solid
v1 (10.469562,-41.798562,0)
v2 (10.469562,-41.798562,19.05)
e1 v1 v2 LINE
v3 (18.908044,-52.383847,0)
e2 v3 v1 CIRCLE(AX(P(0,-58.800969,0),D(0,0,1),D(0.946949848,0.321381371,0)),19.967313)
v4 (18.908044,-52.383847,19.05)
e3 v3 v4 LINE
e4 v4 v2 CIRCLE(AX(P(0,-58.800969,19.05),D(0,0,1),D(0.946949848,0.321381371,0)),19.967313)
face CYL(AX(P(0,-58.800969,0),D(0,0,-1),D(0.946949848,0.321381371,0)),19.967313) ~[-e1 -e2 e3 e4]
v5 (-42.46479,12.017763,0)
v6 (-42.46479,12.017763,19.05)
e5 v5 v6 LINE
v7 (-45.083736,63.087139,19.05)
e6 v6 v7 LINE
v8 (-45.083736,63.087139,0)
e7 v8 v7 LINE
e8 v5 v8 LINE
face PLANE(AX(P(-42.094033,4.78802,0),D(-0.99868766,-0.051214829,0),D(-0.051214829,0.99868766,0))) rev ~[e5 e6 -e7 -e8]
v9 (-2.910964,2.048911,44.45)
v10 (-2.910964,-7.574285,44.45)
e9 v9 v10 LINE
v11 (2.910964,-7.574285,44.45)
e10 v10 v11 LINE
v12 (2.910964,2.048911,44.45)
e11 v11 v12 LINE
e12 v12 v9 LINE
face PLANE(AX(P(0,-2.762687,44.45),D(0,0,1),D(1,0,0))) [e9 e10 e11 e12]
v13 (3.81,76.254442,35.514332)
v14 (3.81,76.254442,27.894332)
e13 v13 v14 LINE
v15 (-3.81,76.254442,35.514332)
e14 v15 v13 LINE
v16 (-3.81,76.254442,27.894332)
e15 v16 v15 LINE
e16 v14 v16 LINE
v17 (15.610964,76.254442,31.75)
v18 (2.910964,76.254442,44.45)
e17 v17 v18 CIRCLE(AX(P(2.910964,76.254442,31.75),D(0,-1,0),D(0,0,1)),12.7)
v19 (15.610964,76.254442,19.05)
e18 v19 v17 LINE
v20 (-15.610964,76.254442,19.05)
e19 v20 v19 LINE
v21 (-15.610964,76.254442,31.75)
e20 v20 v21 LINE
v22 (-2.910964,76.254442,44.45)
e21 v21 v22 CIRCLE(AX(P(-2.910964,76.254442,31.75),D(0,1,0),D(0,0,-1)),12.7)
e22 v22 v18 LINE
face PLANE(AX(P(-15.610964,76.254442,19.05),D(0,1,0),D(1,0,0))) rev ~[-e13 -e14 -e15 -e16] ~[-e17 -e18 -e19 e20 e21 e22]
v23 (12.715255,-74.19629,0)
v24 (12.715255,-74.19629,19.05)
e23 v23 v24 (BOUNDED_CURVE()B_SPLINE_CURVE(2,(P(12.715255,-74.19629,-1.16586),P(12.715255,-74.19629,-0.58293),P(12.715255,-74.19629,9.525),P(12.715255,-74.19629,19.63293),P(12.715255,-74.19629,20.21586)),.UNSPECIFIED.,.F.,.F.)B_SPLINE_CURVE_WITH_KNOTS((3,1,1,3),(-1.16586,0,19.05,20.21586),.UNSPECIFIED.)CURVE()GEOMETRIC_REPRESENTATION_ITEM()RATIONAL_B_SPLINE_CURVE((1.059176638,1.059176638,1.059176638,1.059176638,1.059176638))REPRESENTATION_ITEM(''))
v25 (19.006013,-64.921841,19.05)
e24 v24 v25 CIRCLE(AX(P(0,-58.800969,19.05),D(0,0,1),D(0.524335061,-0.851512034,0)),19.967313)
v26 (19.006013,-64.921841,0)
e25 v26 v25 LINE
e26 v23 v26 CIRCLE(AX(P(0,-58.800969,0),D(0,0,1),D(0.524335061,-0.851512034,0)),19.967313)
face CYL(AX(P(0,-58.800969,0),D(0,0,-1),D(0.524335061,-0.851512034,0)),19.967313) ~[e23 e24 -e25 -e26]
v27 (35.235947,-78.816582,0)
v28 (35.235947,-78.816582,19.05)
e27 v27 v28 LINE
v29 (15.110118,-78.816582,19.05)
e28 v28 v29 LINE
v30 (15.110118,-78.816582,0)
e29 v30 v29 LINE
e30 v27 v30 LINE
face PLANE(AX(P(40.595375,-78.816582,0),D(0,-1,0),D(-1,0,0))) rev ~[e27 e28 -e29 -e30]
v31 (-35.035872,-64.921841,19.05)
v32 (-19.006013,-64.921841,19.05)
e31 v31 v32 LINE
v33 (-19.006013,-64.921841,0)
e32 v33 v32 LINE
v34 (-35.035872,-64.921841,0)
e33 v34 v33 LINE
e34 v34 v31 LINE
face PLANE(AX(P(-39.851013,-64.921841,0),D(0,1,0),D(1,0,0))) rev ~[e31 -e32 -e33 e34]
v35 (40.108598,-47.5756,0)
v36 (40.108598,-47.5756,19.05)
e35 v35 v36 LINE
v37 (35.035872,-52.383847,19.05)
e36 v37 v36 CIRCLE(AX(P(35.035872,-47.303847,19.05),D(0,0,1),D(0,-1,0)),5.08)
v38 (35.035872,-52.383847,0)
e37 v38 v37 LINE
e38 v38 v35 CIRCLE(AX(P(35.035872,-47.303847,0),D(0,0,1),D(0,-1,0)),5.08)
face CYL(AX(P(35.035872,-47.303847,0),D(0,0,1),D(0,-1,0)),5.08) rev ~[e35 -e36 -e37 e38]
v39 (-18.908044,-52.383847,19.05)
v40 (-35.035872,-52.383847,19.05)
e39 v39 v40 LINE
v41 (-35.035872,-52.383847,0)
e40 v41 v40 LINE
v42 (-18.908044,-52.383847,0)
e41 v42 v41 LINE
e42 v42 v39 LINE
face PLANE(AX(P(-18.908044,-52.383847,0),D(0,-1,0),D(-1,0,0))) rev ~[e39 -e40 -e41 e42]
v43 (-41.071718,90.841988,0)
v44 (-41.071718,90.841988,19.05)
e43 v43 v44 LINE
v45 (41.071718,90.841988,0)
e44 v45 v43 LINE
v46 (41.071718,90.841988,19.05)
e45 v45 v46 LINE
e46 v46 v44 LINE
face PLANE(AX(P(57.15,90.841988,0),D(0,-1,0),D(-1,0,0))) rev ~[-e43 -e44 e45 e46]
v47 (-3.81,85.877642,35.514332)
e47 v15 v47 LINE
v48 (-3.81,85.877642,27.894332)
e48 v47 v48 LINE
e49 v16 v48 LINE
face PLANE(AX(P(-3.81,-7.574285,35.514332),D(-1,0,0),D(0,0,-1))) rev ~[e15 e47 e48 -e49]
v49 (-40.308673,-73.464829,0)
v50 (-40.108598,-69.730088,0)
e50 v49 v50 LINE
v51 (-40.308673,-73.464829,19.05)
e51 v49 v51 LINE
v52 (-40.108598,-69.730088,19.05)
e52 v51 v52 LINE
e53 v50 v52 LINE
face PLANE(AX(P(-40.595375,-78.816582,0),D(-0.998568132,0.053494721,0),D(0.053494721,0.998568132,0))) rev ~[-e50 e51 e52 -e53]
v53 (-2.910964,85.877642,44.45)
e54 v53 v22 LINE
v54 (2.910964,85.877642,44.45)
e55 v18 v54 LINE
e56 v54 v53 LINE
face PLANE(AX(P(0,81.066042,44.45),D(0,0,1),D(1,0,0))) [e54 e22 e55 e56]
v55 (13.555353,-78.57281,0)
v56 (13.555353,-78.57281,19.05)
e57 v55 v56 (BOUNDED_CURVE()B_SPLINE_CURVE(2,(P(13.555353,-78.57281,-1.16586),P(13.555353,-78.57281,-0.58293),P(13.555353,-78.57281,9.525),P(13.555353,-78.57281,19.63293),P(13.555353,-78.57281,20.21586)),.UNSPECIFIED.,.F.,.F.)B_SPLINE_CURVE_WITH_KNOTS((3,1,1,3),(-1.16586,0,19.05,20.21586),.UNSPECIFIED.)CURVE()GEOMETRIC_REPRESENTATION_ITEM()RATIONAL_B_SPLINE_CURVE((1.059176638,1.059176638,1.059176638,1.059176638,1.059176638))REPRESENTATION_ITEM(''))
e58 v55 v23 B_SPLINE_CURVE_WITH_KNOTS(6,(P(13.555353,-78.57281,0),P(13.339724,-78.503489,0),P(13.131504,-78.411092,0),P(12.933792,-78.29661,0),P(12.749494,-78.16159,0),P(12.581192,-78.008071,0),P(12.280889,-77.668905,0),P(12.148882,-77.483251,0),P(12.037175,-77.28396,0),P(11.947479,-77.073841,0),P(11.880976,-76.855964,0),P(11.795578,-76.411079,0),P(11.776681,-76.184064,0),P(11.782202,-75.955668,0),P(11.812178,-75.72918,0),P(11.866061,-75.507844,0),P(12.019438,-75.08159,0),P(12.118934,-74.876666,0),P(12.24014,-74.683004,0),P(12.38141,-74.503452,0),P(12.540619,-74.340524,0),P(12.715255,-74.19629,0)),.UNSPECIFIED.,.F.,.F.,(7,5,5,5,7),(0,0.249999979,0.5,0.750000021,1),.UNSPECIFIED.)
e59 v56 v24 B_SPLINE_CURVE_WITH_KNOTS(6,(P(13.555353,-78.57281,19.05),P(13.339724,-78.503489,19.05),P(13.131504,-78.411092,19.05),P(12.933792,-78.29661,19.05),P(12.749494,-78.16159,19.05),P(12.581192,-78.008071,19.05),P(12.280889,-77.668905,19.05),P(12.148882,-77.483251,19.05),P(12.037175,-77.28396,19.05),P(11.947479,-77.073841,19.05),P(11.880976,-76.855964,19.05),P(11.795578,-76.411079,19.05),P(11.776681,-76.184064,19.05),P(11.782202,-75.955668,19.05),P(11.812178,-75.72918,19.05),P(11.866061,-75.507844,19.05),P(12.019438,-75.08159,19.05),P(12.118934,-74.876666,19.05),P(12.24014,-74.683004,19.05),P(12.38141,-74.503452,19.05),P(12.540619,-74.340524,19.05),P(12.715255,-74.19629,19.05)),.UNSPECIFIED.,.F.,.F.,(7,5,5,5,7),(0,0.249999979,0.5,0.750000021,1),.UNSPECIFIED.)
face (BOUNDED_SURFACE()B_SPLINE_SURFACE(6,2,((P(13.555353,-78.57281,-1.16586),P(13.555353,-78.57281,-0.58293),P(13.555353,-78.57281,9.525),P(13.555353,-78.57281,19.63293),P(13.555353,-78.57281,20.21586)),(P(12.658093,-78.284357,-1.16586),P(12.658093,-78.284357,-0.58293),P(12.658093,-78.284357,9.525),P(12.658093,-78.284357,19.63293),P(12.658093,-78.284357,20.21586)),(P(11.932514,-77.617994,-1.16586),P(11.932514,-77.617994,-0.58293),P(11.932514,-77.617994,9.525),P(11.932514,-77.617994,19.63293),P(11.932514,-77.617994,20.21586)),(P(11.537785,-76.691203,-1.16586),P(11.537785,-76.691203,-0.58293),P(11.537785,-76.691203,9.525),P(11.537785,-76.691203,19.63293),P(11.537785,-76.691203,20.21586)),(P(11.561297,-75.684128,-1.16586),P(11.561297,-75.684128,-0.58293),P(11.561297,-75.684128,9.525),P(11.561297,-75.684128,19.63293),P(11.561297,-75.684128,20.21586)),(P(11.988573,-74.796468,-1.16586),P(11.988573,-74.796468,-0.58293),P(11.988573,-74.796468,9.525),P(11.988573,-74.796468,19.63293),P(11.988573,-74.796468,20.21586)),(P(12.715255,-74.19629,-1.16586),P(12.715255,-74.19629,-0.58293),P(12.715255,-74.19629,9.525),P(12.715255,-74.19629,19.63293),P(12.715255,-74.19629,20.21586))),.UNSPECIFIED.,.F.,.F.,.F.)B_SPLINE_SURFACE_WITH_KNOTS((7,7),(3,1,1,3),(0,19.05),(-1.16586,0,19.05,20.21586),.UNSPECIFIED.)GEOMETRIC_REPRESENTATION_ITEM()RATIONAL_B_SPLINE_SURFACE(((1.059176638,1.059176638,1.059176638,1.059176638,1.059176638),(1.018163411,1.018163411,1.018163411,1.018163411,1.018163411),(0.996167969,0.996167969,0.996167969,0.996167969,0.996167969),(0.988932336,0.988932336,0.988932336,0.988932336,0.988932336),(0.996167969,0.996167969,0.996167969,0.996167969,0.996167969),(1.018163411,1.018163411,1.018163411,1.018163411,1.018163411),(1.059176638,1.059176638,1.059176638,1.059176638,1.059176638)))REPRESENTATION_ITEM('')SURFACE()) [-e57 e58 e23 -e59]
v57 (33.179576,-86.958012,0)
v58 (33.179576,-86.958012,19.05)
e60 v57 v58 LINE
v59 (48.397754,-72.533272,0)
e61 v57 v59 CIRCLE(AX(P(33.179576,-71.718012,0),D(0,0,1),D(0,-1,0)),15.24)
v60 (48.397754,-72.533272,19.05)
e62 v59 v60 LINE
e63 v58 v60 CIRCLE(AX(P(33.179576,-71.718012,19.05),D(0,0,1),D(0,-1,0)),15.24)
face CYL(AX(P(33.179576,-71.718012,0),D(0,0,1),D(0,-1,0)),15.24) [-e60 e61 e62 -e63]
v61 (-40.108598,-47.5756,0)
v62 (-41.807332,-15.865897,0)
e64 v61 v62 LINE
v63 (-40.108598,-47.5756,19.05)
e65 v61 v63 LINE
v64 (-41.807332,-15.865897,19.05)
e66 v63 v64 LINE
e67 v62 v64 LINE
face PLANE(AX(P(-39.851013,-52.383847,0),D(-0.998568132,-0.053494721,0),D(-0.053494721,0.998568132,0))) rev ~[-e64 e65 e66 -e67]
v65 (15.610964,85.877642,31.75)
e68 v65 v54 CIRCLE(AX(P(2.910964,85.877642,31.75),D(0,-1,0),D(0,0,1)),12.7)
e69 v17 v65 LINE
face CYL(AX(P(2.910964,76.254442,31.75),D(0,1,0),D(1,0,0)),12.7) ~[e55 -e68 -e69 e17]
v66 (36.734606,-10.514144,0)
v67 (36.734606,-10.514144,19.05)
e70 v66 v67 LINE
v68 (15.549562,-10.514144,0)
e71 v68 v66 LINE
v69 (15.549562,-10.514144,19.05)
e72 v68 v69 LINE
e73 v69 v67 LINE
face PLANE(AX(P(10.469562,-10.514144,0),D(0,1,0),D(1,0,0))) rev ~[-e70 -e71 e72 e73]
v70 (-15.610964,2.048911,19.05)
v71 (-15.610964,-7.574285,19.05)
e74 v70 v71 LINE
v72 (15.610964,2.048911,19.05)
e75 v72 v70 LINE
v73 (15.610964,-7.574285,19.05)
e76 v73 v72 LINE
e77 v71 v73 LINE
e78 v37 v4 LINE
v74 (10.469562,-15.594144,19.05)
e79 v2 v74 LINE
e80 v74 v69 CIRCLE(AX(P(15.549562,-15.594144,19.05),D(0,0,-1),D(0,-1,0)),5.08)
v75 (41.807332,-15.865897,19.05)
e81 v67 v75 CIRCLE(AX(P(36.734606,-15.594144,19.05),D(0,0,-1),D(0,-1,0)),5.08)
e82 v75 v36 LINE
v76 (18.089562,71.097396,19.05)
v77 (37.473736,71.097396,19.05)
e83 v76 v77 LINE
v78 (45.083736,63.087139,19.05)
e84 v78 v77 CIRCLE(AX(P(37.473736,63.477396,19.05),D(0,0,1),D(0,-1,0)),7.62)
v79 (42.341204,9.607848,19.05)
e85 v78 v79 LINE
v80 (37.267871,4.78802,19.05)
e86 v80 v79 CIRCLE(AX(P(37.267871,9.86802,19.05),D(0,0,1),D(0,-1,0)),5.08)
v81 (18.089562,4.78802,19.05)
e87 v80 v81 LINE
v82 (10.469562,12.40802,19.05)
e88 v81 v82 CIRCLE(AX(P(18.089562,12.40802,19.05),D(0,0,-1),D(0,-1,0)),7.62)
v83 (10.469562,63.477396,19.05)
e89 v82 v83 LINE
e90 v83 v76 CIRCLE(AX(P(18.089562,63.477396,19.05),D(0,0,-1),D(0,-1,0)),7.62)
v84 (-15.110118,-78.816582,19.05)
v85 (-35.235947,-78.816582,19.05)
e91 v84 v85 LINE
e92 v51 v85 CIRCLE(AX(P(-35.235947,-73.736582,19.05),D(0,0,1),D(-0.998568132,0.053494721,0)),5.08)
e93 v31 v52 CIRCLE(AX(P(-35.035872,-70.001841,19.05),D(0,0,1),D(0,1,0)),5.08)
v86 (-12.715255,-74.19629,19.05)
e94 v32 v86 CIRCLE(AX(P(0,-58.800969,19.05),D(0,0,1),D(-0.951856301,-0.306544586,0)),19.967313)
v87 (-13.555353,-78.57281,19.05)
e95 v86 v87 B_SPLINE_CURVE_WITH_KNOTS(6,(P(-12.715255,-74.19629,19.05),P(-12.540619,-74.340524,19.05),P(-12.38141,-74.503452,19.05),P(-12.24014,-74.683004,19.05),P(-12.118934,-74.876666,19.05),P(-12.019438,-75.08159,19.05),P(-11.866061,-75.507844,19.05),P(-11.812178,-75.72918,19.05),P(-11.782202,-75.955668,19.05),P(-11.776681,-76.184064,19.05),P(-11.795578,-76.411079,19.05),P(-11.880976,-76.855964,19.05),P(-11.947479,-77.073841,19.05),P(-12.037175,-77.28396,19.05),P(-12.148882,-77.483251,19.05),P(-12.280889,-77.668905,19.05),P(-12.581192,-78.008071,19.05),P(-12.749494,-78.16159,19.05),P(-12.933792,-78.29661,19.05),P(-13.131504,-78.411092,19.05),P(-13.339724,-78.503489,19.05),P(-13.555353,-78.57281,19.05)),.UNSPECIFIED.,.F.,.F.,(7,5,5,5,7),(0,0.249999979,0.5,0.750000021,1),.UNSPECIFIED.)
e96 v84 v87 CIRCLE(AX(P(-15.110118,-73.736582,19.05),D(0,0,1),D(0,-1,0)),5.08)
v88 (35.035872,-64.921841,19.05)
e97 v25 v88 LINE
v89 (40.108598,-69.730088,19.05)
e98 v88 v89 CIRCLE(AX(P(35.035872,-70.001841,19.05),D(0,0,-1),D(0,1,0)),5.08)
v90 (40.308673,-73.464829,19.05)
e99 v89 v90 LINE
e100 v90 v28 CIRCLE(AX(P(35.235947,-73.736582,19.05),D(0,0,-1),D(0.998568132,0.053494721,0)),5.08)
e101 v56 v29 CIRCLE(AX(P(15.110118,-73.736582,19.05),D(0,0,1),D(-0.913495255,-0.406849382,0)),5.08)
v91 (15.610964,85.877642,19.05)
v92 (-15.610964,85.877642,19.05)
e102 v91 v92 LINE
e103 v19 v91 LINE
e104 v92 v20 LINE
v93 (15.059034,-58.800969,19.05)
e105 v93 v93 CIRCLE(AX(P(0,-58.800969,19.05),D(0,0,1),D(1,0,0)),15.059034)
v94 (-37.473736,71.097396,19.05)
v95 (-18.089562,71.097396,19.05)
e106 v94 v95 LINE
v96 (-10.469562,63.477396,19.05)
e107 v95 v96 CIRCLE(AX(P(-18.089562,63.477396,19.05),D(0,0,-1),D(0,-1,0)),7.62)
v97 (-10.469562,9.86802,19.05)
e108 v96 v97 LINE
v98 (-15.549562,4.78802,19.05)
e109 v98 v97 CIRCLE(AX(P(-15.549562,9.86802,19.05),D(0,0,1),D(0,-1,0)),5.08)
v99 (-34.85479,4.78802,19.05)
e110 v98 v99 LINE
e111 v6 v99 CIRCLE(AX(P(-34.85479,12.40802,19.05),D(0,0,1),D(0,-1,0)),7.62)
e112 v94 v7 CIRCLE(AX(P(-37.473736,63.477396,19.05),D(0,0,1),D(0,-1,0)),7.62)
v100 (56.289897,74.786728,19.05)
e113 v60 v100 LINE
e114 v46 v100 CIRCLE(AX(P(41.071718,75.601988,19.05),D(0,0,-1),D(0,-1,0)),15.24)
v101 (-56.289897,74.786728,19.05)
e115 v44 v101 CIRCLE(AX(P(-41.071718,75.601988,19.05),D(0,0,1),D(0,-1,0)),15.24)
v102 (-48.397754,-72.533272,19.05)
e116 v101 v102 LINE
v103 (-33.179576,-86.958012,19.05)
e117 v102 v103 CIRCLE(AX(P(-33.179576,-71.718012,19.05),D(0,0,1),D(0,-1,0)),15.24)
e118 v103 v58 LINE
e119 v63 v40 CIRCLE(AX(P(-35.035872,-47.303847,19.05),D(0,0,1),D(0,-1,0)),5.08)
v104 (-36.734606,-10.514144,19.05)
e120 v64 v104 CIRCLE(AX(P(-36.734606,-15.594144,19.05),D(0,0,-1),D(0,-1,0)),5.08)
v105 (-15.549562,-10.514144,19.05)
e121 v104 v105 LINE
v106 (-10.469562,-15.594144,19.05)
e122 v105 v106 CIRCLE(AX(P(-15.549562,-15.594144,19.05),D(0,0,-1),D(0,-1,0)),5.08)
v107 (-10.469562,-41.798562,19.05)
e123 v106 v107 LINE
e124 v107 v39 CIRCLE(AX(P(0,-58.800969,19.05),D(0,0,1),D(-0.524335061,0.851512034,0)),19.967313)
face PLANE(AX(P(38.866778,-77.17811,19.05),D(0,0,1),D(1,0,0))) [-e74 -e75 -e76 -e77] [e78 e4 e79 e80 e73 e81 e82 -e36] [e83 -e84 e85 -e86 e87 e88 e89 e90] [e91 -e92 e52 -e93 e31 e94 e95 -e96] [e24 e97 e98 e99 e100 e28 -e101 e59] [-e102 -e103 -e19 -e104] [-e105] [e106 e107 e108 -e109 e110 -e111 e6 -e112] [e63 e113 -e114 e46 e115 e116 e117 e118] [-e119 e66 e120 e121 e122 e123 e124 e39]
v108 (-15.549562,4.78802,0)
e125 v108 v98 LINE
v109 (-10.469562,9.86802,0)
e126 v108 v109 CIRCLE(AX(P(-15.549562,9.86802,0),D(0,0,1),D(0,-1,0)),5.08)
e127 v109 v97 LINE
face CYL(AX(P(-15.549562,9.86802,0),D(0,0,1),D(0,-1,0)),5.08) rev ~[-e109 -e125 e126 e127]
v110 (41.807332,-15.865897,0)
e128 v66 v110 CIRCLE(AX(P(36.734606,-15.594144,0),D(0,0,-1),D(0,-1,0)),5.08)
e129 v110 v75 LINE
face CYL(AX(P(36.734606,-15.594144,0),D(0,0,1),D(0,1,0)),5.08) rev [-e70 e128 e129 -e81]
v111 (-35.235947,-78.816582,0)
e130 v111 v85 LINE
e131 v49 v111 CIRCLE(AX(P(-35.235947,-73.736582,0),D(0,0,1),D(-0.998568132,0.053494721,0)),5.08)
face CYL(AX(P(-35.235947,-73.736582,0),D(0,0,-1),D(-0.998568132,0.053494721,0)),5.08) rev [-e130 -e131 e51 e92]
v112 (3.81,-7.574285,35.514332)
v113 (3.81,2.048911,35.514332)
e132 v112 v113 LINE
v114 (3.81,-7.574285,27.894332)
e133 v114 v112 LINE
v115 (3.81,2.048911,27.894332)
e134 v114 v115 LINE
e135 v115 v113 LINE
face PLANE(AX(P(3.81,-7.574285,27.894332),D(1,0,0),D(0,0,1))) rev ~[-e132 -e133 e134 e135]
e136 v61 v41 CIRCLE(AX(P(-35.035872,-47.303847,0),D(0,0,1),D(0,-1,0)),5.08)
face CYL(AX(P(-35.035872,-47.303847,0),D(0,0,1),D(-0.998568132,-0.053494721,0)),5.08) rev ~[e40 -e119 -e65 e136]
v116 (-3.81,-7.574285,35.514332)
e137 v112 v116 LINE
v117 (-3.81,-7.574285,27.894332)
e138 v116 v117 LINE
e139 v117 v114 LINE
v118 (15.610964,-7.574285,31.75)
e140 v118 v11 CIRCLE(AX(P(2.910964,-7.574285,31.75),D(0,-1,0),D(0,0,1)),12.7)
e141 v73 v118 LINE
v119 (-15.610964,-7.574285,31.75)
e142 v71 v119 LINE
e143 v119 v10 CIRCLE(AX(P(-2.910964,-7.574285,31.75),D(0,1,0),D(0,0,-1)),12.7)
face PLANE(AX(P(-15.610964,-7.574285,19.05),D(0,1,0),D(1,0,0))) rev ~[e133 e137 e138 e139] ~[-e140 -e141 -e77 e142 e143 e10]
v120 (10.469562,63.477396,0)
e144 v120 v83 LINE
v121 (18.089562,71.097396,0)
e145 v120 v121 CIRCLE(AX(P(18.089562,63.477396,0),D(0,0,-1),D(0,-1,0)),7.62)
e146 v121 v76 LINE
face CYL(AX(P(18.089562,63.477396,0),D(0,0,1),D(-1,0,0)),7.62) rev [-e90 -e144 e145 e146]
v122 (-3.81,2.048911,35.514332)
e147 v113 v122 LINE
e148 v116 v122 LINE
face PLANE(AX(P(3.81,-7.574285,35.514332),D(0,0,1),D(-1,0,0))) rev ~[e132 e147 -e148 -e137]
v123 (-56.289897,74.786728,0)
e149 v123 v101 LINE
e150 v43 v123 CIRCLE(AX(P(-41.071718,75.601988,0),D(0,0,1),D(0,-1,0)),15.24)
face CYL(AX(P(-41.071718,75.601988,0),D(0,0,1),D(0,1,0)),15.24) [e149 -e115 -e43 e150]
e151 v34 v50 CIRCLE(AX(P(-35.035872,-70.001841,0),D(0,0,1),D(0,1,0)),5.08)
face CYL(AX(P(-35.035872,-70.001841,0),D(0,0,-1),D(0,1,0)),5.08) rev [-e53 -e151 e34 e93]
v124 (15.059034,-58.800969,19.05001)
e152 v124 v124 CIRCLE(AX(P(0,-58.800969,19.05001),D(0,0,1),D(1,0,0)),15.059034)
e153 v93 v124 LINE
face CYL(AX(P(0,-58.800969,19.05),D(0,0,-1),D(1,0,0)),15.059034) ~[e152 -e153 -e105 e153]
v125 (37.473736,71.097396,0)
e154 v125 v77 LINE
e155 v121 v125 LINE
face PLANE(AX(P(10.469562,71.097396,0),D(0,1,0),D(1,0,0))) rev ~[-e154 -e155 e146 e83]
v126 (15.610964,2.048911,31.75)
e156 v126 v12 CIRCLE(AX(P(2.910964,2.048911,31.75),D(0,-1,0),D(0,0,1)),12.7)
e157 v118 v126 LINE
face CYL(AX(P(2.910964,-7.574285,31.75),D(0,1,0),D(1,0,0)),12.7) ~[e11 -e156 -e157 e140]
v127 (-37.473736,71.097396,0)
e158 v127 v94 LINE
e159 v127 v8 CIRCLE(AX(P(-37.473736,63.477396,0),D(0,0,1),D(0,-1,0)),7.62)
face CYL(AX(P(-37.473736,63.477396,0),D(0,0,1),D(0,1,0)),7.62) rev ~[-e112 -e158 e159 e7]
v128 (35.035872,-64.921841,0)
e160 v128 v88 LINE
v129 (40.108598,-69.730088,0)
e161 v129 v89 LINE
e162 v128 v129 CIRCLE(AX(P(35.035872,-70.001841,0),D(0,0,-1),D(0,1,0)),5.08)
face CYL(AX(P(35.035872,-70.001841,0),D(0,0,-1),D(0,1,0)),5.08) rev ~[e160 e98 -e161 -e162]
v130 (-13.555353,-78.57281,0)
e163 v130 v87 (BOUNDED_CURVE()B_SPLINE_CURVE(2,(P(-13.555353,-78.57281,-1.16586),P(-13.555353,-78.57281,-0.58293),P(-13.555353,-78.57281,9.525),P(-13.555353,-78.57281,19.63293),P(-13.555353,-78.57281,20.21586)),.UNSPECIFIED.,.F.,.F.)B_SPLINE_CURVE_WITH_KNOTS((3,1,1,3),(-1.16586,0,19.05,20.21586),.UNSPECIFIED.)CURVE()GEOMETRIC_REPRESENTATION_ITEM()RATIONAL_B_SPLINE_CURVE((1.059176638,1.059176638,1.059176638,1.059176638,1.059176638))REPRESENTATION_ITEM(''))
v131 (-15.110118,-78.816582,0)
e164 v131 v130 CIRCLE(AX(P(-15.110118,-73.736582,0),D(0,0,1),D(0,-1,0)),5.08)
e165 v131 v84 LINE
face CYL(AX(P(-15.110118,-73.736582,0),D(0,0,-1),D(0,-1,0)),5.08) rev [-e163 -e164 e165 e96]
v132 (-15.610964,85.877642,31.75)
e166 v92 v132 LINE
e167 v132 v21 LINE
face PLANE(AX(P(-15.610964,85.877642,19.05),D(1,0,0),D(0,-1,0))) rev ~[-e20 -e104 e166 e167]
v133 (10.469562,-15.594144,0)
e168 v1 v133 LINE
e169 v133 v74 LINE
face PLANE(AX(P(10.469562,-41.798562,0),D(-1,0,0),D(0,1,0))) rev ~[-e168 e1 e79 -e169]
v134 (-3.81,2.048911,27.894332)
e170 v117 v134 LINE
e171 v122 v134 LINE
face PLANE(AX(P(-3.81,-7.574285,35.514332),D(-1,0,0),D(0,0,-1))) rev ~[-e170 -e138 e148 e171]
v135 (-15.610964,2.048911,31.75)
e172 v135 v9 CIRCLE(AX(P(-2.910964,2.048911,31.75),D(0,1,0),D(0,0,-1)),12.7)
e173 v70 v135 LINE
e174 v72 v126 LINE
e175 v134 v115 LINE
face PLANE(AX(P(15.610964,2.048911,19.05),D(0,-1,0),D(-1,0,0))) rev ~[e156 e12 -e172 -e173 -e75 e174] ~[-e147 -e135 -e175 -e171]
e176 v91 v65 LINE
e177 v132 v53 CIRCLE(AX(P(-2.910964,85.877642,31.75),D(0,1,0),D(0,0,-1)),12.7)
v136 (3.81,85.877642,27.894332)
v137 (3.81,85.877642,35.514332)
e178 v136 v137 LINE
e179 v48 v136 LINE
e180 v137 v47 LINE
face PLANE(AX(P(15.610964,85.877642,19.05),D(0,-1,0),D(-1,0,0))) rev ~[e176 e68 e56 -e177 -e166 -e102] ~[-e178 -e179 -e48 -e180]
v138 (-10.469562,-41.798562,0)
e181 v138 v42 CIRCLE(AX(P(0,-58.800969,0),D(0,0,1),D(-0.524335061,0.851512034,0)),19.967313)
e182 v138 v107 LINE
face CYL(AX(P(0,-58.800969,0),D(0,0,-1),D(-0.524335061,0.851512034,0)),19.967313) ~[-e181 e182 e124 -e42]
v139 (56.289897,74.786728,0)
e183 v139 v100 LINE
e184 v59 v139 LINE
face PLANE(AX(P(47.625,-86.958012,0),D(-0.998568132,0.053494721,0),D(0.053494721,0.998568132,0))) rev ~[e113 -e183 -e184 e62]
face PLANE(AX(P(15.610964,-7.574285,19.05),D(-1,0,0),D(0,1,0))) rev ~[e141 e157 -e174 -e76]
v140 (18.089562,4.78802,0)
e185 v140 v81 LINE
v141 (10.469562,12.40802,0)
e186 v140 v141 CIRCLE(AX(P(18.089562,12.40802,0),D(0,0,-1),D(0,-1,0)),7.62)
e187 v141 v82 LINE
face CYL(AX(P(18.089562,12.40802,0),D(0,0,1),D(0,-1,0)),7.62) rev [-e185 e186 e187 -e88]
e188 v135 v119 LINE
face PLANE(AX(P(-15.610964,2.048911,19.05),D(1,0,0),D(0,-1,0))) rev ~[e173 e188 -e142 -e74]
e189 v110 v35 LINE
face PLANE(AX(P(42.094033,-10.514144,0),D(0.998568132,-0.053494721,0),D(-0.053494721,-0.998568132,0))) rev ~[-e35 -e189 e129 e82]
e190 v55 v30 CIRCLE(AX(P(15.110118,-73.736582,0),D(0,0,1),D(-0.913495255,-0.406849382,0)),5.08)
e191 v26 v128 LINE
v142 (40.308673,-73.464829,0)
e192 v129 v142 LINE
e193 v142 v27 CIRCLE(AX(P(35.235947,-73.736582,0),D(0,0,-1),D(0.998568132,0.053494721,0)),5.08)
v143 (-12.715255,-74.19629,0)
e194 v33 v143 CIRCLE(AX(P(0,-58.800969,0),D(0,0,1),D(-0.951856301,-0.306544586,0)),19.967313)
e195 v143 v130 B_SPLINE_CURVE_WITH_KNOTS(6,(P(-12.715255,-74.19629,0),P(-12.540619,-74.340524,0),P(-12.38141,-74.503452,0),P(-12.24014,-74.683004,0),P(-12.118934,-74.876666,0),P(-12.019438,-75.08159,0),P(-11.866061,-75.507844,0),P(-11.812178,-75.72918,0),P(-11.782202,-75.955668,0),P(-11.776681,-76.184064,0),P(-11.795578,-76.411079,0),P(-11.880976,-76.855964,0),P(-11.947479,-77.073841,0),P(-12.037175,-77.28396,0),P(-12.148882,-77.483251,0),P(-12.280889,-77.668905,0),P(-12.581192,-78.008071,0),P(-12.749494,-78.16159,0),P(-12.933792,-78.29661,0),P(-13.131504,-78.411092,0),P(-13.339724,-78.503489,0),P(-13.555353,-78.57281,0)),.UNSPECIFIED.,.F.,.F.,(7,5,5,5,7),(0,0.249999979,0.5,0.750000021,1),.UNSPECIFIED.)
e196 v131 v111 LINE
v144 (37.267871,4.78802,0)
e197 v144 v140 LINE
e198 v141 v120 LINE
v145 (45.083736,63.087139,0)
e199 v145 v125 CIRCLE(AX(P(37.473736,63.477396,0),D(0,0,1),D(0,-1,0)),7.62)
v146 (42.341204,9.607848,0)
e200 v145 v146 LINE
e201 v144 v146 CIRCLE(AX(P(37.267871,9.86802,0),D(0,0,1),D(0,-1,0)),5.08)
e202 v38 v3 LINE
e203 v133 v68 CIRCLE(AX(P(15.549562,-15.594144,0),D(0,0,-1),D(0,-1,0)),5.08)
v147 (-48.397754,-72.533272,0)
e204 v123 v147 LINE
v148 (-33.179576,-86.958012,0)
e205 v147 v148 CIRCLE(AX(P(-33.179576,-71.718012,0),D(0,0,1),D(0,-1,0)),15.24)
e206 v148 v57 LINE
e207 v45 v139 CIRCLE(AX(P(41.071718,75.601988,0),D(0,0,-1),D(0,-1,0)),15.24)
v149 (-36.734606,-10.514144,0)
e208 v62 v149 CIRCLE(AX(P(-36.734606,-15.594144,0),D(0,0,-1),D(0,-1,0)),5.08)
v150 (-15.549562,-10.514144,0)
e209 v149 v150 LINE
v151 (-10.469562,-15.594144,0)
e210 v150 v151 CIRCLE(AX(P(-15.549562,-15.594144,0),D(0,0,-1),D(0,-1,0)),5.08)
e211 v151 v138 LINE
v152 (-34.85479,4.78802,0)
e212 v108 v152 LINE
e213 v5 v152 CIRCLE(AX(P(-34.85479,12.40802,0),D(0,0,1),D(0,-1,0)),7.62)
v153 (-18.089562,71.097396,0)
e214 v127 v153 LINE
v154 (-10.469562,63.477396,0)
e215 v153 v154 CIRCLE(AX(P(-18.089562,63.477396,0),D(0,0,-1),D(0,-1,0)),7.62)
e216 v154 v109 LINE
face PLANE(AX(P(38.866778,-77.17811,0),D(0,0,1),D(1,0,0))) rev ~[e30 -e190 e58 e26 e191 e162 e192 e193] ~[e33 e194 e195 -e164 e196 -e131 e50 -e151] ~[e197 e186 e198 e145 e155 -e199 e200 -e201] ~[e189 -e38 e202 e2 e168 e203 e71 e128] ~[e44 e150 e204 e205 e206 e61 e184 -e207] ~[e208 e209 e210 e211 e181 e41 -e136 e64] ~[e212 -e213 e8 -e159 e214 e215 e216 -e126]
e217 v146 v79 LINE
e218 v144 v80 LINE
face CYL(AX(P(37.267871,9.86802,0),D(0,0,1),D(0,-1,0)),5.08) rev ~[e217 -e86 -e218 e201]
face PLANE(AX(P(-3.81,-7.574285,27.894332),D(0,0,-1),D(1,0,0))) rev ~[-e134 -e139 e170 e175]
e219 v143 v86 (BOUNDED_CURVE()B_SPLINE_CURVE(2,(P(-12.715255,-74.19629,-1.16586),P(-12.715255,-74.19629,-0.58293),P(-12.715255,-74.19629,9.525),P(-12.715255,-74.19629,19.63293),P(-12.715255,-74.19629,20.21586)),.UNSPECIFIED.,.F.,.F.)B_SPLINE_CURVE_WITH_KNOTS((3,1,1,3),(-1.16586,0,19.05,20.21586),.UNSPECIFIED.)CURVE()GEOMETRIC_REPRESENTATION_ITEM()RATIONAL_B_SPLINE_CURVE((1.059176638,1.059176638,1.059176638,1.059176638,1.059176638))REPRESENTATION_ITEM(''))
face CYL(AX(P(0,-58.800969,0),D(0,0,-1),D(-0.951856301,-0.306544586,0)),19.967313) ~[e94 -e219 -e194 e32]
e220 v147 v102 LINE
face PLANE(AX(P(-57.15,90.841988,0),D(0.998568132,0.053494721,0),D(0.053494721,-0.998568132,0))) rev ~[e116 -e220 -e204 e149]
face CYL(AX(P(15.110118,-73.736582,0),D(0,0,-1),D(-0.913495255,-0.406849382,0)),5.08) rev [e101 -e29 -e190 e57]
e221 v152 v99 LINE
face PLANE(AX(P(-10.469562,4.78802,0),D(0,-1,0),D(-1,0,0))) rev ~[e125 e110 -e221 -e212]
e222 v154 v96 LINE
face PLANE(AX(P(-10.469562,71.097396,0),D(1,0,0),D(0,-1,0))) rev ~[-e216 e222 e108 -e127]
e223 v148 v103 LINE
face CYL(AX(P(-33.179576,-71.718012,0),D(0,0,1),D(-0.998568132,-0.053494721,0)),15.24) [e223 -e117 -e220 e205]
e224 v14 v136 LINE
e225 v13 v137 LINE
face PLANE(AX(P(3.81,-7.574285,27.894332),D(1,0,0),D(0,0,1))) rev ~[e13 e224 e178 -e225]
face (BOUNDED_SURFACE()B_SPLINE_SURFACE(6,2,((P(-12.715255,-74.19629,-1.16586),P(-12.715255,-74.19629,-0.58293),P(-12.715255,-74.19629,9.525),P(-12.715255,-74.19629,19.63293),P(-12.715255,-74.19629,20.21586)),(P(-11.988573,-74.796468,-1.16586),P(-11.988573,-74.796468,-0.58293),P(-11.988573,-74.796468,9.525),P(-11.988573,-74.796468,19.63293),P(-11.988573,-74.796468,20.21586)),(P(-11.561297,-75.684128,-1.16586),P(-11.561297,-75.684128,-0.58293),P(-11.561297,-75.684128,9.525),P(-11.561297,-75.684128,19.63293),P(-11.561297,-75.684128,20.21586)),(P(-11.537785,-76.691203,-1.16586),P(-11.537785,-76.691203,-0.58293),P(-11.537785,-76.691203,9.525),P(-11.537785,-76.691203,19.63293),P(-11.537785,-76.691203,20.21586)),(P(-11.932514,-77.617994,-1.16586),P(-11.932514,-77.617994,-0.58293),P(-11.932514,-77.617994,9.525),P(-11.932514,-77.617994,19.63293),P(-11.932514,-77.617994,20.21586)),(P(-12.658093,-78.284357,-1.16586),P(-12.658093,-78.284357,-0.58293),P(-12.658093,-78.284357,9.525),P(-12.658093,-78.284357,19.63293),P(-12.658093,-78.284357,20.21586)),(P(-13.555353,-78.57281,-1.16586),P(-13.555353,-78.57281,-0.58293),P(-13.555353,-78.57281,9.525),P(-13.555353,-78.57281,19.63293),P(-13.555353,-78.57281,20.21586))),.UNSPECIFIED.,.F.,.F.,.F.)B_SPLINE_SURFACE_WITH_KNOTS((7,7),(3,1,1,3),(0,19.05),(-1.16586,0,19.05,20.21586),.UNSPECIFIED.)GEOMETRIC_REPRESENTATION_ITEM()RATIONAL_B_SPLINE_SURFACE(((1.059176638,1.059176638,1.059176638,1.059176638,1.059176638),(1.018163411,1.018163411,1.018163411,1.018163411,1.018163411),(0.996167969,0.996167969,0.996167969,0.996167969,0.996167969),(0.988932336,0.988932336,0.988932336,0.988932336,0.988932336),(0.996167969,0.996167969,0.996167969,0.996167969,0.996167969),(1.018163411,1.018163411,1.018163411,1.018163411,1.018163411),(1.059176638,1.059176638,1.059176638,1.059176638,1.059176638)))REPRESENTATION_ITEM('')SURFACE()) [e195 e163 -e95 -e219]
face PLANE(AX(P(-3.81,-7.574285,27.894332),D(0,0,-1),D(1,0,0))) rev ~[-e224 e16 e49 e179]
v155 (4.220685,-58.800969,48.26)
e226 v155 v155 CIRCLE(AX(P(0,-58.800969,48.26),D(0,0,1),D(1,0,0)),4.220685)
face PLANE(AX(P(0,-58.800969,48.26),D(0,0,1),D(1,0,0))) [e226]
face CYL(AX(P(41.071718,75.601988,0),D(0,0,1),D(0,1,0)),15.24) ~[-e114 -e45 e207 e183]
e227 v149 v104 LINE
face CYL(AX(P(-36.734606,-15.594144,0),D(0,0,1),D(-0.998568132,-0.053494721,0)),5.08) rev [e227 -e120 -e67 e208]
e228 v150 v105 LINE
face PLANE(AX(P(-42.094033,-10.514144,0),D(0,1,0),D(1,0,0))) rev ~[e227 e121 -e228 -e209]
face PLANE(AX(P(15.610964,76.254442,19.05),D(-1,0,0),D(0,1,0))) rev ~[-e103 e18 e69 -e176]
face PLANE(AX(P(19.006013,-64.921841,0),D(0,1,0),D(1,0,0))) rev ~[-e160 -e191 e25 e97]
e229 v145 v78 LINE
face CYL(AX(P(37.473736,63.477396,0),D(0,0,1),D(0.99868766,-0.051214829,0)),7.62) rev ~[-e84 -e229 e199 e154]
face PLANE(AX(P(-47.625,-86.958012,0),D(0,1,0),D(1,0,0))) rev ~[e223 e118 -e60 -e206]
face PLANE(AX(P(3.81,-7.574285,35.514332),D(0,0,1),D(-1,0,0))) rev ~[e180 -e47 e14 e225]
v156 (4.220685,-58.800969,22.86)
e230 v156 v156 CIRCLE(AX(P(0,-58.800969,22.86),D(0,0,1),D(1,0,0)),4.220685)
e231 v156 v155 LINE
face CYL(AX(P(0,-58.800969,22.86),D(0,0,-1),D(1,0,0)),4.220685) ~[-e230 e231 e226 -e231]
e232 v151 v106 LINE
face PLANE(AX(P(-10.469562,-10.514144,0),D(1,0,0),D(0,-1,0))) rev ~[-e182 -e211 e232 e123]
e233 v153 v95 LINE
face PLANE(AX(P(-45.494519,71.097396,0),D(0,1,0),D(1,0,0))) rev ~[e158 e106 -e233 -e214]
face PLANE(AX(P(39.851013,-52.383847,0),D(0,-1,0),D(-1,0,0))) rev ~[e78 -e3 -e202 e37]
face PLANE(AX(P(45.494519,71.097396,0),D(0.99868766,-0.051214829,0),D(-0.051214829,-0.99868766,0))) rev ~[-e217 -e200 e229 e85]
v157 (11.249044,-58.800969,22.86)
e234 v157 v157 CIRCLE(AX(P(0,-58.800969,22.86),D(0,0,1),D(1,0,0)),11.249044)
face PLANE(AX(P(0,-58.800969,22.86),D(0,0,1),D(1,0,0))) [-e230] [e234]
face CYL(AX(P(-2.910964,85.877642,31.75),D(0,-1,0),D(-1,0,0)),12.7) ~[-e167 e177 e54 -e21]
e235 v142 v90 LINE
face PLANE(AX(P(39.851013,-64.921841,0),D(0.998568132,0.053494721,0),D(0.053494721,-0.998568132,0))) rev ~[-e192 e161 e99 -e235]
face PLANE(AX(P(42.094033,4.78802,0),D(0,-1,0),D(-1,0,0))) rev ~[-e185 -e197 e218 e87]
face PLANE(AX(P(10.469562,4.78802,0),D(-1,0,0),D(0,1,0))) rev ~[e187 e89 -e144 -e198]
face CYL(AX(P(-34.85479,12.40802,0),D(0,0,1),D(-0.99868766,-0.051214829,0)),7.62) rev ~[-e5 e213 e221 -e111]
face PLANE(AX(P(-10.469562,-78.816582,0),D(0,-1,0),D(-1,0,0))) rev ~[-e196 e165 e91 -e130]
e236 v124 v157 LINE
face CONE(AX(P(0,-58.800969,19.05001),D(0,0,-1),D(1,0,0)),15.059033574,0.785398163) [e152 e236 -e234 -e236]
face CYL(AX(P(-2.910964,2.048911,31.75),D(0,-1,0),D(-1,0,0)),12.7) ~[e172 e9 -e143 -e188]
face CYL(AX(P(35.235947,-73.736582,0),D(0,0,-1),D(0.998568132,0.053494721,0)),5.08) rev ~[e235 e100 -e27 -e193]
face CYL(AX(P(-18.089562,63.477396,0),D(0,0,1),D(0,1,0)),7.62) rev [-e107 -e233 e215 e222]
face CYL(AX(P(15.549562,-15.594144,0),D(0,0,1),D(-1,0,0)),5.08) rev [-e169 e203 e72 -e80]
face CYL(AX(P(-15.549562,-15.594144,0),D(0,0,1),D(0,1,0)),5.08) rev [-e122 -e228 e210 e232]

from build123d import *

# Parameters (mm, degrees)
F1_DEPTH     = 19.05
F2_R         = 15.059033574
F3_DEPTH     = 3.81
F6_DEPTH     = 25.4
F8_DEPTH     = 98.4172728563
F4_R         = 4.2206847971
F9_DEPTH     = 25.4
F10_SIZE     = 3.80999
F11_R        = 12.7
F12_R        = 12.7
F13_R        = 7.62
F14_R        = 5.08
F15_R        = 7.62
F16_R        = 7.62
F17_R        = 5.08
F18_R        = 7.62
F19_R        = 5.08
F20_T1_DEPTH = 19.05
F21_R        = 2.54
F22_R        = 15.24


# Not quite as in the source:
# - a fillet or chamfer that OpenCascade refuses, or shapes differently, is made with other operations: its cross-section is extruded or revolved along the edge and cut away or added
# - a fillet or chamfer is up to 0.001 mm smaller than in the source, because OpenCascade refuses the exact size


with BuildPart() as f1:
    # F0 (on Top) → F1 (new body)
    with BuildSketch(Plane.XY):
        Polygon((57.15, 90.8419879414), (0, 90.8419879414), (-57.15, 90.8419879414), (-47.625, -86.9580120586), (0, -86.9580120586), (47.625, -86.9580120586), align=None)
        with BuildLine():
            Line((-39.8510134111, -64.9218410254), (-19.0060128585, -64.9218410254))
            ThreePointArc((-19.0060128585, -64.9218410254), (-15.7100075961, -71.1253052436), (-10.4695623741, -75.8033767343))
            Line((-10.4695623741, -75.8033767343), (-10.4695623741, -78.8165818754))
            Line((-10.4695623741, -78.8165818754), (-40.5953745281, -78.8165818754))
            Line((-40.5953745281, -78.8165818754), (-39.8510134111, -64.9218410254))
        make_face(mode=Mode.SUBTRACT)
        with BuildLine():
            Line((-42.0940332115, -10.5141438544), (-10.4695623741, -10.5141438544))
            Line((-10.4695623741, -10.5141438544), (-10.4695623741, -41.7985618114))
            ThreePointArc((-10.4695623741, -41.7985618114), (-15.6132317705, -46.3542592872), (-18.9080441845, -52.3838467943))
            Line((-18.9080441845, -52.3838467943), (-39.8510134111, -52.3838467943))
            Line((-39.8510134111, -52.3838467943), (-42.0940332115, -10.5141438544))
        make_face(mode=Mode.SUBTRACT)
        with BuildLine():
            Line((19.0060128585, -64.9218410254), (39.8510134111, -64.9218410254))
            Line((39.8510134111, -64.9218410254), (40.5953745281, -78.8165818754))
            Line((40.5953745281, -78.8165818754), (10.4695623741, -78.8165818754))
            Line((10.4695623741, -78.8165818754), (10.4695623741, -75.8033767343))
            ThreePointArc((10.4695623741, -75.8033767343), (15.7100075961, -71.1253052436), (19.0060128585, -64.9218410254))
        make_face(mode=Mode.SUBTRACT)
        with BuildLine():
            Line((10.4695623741, -10.5141438544), (42.0940332115, -10.5141438544))
            Line((42.0940332115, -10.5141438544), (39.8510134111, -52.3838467943))
            Line((39.8510134111, -52.3838467943), (18.9080441845, -52.3838467943))
            ThreePointArc((18.9080441845, -52.3838467943), (15.6132317705, -46.3542592872), (10.4695623741, -41.7985618114))
            Line((10.4695623741, -41.7985618114), (10.4695623741, -10.5141438544))
        make_face(mode=Mode.SUBTRACT)
        Polygon((-10.4695623741, 71.0973963141), (-10.4695623741, 4.7880196944), (-42.0940332115, 4.7880196944), (-45.4945191741, 71.0973963141), align=None, mode=Mode.SUBTRACT)
        Polygon((10.4695623741, 4.7880196944), (10.4695623741, 71.0973963141), (45.4945191741, 71.0973963141), (42.0940332115, 4.7880196944), align=None, mode=Mode.SUBTRACT)
    extrude(amount=F1_DEPTH)

    # F2 (on face) → F3 (join)
    with BuildSketch(Plane.XY.offset(19.05)):
        with Locations((0, -58.8009692729)):
            Circle(F2_R)
    extrude(amount=F3_DEPTH)

    # F5 (on face) → F6 (join)
    with BuildSketch(Plane.XY.offset(19.05)):
        Polygon((15.6109640375, 85.8776420355), (0, 85.8776420355), (-15.6109640375, 85.8776420355), (-15.6109640375, 76.2544423342), (0, 76.2544423342), (15.6109640375, 76.2544423342), align=None)
        Polygon((-15.6109640375, -7.5742849149), (0, -7.5742849149), (15.6109640375, -7.5742849149), (15.6109640375, 2.0489108283), (0, 2.0489108283), (-15.6109640375, 2.0489108283), align=None)
    extrude(amount=F6_DEPTH)

    # F7 (on face) → F8 (cut, through all)
    with BuildSketch(Plane.XZ.offset(7.5742849149)):
        Polygon((3.81, 35.5143319389), (0, 35.5143319389), (-3.81, 35.5143319389), (-3.81, 27.8943319389), (0, 27.8943319389), (3.81, 27.8943319389), align=None)
    extrude(amount=-F8_DEPTH, mode=Mode.SUBTRACT)

    # F4 (on face) → F9 (join)
    with BuildSketch(Plane.XY.offset(22.86)):
        with Locations((0, -58.8009692729)):
            Circle(F4_R)
    extrude(amount=F9_DEPTH)

    # F10 (size 3.81 in the source; OpenCascade refuses exactly that, so slightly less here)
    f10_edges = [f1.edges().sort_by_distance(p)[0] for p in [
        (-15.059034, -58.800969, 22.86),
    ]]
    chamfer(f10_edges, length=F10_SIZE)

    # F11
    f11_edges = [f1.edges().sort_by_distance(p)[0] for p in [
        (15.610964, -2.762687, 44.45),
        (-15.610964, -2.762687, 44.45),
    ]]
    fillet(f11_edges, radius=F11_R)

    # F12
    f12_edges = [f1.edges().sort_by_distance(p)[0] for p in [
        (15.610964, 81.066042, 44.45),
        (-15.610964, 81.066042, 44.45),
    ]]
    fillet(f12_edges, radius=F12_R)

    # F13
    f13_edges = [f1.edges().sort_by_distance(p)[0] for p in [
        (-45.494519, 71.097396, 9.525),
    ]]
    fillet(f13_edges, radius=F13_R)

    # F14
    f14_edges = [f1.edges().sort_by_distance(p)[0] for p in [
        (-42.094033, -10.514144, 9.525),
    ]]
    fillet(f14_edges, radius=F14_R)

    # F15
    f15_edges = [f1.edges().sort_by_distance(p)[0] for p in [
        (-10.469562, 71.097396, 9.525),
        (45.494519, 71.097396, 9.525),
    ]]
    fillet(f15_edges, radius=F15_R)

    # F16
    f16_edges = [f1.edges().sort_by_distance(p)[0] for p in [
        (-42.094033, 4.78802, 9.525),
        (10.469562, 4.78802, 9.525),
    ]]
    fillet(f16_edges, radius=F16_R)

    # F17
    f17_edges = [f1.edges().sort_by_distance(p)[0] for p in [
        (-10.469562, 4.78802, 9.525),
        (42.094033, 4.78802, 9.525),
    ]]
    fillet(f17_edges, radius=F17_R)

    # F18
    f18_edges = [f1.edges().sort_by_distance(p)[0] for p in [
        (10.469562, 71.097396, 9.525),
    ]]
    fillet(f18_edges, radius=F18_R)

    # F19
    f19_edges = [f1.edges().sort_by_distance(p)[0] for p in [
        (-10.469562, -10.514144, 9.525),
        (42.094033, -10.514144, 9.525),
        (10.469562, -10.514144, 9.525),
        (-39.851013, -52.383847, 9.525),
        (39.851013, -52.383847, 9.525),
    ]]
    fillet(f19_edges, radius=F19_R)

    # F20: fillet of radius 5.08 on 6 edges, made by hand

    # F20_s2 → F20_t1 (join)
    with BuildSketch(Plane.XY):
        with BuildLine():
            ThreePointArc((40.3086734646, -73.4648286909), (38.9228773885, -77.2312845683), (35.2359473527, -78.8165818754))
            Line((35.2359473527, -78.8165818754), (40.5953745281, -78.8165818754))
            Line((40.5953745281, -78.8165818754), (40.3086734646, -73.4648286909))
        make_face()
        with BuildLine():
            ThreePointArc((-15.1101182687, -78.8165818754), (-12.3436148694, -77.9971990774), (-10.4695623741, -75.8033767343))
            Line((-10.4695623741, -75.8033767343), (-10.4695623741, -78.8165818754))
            Line((-10.4695623741, -78.8165818754), (-15.1101182687, -78.8165818754))
        make_face()
        with BuildLine():
            ThreePointArc((-40.3086734646, -73.4648286909), (-38.9228773885, -77.2312845683), (-35.2359473527, -78.8165818754))
            Line((-35.2359473527, -78.8165818754), (-40.5953745281, -78.8165818754))
            Line((-40.5953745281, -78.8165818754), (-40.3086734646, -73.4648286909))
        make_face()
        with BuildLine():
            ThreePointArc((10.4695623741, -75.8033767343), (12.3436148694, -77.9971990774), (15.1101182687, -78.8165818754))
            Line((15.1101182687, -78.8165818754), (10.4695623741, -78.8165818754))
            Line((10.4695623741, -78.8165818754), (10.4695623741, -75.8033767343))
        make_face()
        with BuildLine():
            ThreePointArc((35.03587195, -64.9218410254), (38.5305746428, -66.3149109896), (40.1085980619, -69.7300878408))
            Line((40.1085980619, -69.7300878408), (39.8510134111, -64.9218410254))
            Line((39.8510134111, -64.9218410254), (35.03587195, -64.9218410254))
        make_face()
        with BuildLine():
            ThreePointArc((-35.03587195, -64.9218410254), (-38.5305746428, -66.3149109896), (-40.1085980619, -69.7300878408))
            Line((-40.1085980619, -69.7300878408), (-39.8510134111, -64.9218410254))
            Line((-39.8510134111, -64.9218410254), (-35.03587195, -64.9218410254))
        make_face()
    extrude(amount=F20_T1_DEPTH)

    # F21
    f21_edges = [f1.edges().sort_by_distance(p)[0] for p in [
        (10.469562, -75.803377, 9.525),
        (-10.469562, -75.803377, 9.525),
    ]]
    fillet(f21_edges, radius=F21_R)

    # F22
    f22_edges = [f1.edges().sort_by_distance(p)[0] for p in [
        (-47.625, -86.958012, 9.525),
        (-57.15, 90.841988, 9.525),
        (57.15, 90.841988, 9.525),
        (47.625, -86.958012, 9.525),
    ]]
    fillet(f22_edges, radius=F22_R)


solid = f1.part
